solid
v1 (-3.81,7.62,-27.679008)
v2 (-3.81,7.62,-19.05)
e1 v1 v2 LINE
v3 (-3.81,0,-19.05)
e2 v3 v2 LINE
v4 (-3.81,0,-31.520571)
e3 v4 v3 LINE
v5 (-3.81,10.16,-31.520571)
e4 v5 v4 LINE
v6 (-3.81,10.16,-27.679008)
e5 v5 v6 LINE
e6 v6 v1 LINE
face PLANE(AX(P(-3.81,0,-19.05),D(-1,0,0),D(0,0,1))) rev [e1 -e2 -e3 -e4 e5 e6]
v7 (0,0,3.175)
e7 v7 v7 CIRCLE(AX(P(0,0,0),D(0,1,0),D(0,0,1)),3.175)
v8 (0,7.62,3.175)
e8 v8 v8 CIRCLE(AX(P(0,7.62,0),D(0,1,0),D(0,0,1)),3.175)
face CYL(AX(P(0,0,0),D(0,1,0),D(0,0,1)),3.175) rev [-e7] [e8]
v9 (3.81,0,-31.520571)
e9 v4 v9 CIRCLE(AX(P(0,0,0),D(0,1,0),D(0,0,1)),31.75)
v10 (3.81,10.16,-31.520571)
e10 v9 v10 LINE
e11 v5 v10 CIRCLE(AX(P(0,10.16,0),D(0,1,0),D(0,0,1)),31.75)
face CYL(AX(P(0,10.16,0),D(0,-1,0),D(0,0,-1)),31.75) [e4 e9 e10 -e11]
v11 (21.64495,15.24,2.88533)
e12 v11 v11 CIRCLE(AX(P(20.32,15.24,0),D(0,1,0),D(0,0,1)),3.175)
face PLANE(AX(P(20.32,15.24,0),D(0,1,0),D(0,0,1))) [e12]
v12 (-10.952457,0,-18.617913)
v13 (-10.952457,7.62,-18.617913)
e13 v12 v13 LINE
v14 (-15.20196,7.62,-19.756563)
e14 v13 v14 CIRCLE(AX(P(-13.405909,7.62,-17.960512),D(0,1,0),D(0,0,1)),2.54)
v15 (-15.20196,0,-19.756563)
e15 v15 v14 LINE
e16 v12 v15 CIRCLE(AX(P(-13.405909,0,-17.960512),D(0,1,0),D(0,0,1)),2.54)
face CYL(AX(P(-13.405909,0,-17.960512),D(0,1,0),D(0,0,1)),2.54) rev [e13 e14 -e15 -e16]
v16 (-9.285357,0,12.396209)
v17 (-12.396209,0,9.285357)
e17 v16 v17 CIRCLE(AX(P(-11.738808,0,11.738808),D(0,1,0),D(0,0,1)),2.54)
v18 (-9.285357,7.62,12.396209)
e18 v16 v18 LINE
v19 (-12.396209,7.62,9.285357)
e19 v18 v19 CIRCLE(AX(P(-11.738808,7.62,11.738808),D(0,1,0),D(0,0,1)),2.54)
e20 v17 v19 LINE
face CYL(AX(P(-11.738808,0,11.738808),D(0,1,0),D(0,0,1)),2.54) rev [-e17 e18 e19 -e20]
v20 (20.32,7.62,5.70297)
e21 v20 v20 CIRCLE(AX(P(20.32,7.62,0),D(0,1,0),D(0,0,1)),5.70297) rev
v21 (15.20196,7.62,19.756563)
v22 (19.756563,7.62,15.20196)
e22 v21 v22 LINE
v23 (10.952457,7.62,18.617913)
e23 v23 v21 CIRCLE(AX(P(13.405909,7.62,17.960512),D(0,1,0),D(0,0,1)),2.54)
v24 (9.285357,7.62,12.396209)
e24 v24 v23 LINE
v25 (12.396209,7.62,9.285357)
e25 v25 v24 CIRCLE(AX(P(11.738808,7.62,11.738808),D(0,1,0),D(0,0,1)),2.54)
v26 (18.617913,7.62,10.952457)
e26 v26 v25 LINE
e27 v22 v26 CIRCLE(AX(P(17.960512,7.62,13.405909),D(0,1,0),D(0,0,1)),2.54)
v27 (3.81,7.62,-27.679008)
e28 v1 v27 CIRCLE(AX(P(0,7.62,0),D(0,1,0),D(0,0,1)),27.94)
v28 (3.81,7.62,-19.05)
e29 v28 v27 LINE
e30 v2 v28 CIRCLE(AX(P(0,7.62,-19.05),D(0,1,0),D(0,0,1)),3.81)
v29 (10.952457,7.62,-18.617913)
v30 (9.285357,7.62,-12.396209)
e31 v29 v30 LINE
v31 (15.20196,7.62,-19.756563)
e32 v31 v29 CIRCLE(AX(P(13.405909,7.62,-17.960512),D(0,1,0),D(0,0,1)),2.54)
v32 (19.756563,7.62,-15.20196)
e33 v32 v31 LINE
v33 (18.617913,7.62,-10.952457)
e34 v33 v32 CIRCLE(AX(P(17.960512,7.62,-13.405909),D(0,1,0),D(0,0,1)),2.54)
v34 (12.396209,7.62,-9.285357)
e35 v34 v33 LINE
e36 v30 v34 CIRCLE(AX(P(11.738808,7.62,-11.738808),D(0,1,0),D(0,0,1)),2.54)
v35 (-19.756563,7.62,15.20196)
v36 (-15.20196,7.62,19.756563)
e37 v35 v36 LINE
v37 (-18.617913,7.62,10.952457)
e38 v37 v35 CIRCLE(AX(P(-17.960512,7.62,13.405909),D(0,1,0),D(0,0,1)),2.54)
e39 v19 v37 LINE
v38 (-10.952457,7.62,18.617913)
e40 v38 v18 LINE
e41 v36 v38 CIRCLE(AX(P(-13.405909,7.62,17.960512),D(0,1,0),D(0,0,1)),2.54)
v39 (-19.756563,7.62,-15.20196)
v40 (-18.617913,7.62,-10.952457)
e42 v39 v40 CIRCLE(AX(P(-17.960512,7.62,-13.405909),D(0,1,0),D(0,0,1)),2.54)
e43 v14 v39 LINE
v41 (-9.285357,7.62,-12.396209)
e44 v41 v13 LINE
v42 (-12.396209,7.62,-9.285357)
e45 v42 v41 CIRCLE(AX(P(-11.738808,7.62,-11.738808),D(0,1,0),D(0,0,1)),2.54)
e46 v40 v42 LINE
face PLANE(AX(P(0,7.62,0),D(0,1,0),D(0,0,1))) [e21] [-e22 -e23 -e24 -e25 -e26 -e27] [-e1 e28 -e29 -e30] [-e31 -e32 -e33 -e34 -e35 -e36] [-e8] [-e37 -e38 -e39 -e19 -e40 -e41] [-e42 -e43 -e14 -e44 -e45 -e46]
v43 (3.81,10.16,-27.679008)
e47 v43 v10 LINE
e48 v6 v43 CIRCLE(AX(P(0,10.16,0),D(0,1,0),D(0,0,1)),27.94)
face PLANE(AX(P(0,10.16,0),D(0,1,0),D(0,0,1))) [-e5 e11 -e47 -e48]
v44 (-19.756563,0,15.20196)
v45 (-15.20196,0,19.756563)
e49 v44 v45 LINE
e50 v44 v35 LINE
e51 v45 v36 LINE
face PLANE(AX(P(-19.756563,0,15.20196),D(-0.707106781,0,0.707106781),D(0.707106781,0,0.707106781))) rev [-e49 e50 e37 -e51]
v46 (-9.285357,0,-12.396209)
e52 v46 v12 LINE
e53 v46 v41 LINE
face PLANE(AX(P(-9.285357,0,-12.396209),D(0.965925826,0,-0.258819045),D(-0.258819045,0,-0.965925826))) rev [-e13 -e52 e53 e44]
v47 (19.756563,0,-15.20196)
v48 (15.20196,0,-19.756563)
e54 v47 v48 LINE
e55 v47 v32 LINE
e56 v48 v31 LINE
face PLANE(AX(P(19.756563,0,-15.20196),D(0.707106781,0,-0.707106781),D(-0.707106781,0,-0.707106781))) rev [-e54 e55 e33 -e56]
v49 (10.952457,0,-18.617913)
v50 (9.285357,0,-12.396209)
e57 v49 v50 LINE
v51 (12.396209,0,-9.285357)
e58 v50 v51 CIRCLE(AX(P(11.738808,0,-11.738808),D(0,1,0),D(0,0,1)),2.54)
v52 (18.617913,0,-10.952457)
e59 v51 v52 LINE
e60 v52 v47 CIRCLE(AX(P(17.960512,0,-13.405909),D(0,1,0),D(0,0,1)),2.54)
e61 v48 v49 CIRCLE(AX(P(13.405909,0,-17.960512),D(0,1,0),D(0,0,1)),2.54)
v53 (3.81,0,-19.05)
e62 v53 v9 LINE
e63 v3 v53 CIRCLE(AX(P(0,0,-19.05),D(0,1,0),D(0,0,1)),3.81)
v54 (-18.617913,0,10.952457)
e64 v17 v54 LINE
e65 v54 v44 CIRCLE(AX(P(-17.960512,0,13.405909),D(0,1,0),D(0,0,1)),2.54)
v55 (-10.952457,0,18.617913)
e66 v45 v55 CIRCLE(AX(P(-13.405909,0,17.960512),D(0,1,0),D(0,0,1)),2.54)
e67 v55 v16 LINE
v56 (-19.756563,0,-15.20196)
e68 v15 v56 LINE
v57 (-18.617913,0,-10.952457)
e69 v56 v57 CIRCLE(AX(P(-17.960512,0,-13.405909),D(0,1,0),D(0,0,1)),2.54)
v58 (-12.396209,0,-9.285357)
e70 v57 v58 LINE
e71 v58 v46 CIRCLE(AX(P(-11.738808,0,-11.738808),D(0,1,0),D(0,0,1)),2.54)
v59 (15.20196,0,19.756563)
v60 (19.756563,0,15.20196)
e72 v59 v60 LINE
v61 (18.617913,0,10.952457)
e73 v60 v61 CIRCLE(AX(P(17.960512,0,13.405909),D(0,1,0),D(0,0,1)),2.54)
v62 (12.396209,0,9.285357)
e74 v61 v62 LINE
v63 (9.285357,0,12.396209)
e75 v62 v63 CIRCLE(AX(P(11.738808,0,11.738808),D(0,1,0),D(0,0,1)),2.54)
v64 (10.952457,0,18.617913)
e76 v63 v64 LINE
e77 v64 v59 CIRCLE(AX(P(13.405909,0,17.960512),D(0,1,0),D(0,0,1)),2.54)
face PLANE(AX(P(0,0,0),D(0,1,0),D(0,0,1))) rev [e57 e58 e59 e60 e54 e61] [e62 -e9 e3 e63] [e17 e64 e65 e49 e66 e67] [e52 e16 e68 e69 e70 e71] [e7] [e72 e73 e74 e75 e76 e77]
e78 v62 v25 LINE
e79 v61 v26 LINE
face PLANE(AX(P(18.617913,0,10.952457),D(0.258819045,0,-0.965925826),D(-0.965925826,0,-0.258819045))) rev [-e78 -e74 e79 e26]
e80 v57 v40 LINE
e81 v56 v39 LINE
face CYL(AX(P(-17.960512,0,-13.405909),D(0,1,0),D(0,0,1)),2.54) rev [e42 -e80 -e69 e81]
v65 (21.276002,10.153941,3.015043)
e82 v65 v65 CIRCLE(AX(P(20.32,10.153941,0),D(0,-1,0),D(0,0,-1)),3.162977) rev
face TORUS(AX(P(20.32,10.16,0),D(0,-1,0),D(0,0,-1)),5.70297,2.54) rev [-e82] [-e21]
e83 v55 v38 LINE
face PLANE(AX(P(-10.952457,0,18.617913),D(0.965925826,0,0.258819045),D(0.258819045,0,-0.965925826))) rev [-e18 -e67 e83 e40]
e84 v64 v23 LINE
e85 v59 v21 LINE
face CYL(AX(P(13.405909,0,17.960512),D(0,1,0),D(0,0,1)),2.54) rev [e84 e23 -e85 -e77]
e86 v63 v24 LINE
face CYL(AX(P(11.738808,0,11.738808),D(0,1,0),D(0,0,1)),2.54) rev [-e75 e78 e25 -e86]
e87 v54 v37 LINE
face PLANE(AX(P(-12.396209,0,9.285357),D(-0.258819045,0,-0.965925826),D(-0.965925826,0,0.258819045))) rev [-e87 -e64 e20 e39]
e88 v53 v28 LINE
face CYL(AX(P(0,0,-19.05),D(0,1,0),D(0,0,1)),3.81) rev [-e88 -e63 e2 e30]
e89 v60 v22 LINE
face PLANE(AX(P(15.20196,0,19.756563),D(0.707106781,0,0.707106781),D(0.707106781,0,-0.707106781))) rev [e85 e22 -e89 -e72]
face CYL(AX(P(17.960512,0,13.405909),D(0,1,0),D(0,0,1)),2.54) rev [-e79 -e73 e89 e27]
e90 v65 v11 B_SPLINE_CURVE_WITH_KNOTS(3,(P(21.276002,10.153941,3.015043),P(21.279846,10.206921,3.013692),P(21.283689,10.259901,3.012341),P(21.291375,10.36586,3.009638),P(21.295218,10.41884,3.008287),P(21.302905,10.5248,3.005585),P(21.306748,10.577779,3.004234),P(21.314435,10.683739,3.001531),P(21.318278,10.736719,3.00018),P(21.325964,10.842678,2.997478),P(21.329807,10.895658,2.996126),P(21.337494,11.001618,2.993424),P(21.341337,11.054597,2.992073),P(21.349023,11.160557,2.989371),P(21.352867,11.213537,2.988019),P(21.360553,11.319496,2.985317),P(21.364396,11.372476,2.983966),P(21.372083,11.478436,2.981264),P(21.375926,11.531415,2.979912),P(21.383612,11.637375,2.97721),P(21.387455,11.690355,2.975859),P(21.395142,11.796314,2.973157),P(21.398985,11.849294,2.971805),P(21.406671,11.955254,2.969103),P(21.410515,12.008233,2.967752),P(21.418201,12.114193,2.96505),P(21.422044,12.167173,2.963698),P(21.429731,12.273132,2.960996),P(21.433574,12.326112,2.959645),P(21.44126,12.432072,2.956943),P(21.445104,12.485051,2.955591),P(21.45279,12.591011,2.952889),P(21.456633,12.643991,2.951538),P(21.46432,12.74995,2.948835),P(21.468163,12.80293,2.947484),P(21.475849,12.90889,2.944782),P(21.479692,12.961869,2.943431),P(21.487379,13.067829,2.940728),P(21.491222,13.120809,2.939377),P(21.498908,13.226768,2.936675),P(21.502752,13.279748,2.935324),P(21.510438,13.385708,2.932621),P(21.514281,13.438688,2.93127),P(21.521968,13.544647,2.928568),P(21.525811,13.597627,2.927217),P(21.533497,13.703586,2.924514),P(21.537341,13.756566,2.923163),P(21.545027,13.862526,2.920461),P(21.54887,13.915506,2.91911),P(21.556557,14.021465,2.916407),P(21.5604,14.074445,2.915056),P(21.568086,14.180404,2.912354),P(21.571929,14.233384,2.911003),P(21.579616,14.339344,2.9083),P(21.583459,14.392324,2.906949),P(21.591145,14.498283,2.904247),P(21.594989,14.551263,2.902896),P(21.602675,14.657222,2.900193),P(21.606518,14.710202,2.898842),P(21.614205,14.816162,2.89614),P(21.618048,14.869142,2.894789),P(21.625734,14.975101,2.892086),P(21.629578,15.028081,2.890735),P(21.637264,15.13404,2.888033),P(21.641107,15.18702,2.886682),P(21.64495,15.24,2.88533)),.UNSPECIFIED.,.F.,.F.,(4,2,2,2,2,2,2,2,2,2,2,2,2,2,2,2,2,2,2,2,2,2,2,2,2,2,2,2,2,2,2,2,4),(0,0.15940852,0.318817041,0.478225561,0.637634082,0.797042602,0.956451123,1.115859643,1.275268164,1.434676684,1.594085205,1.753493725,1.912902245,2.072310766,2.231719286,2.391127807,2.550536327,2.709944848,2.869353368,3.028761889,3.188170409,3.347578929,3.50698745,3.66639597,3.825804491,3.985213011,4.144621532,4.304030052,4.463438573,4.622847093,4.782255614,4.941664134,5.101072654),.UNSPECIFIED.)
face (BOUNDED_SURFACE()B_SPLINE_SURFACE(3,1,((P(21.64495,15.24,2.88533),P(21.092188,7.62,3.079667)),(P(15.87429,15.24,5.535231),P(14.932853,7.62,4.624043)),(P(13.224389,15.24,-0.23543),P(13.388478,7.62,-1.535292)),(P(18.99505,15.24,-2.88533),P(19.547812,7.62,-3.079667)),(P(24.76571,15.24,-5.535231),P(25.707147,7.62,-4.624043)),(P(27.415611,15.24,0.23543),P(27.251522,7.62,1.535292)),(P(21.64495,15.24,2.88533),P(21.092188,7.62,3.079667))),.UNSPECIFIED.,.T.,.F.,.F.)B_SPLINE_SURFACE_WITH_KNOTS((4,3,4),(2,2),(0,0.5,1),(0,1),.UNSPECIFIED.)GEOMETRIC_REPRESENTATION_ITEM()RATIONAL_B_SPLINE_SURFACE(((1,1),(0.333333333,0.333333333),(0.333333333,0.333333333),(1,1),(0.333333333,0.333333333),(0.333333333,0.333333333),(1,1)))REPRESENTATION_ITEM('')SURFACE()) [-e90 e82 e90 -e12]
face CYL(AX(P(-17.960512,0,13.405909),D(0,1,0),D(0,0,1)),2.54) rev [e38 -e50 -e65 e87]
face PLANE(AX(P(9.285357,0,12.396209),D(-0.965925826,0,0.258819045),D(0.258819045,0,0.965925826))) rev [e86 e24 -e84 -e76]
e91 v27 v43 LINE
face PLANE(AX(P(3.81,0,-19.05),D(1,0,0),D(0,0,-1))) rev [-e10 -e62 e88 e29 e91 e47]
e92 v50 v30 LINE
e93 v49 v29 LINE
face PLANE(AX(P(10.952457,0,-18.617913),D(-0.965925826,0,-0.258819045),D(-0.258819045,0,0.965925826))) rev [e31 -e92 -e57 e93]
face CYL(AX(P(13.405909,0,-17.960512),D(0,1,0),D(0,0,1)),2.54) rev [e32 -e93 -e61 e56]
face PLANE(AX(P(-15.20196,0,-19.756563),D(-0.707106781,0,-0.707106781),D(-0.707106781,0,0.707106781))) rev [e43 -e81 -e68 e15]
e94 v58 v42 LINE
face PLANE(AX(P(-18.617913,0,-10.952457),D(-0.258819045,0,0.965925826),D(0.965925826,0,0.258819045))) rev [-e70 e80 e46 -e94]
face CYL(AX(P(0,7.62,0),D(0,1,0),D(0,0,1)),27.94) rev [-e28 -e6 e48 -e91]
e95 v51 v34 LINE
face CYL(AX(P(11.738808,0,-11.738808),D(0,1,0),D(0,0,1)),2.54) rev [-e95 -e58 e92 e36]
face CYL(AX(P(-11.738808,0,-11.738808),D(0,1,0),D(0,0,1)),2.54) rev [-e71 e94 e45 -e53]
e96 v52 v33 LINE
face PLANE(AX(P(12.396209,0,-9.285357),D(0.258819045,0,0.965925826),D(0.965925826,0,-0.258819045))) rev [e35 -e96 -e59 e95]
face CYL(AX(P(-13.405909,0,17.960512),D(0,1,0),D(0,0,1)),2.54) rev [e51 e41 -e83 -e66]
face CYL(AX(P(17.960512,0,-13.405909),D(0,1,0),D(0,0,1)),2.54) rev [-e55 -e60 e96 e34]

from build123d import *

# Parameters (mm, degrees)
SKETCH1_R           = 31.75
BOSS_EXTRUDE3_DEPTH = 10.16
SKETCH3_R           = 27.94
CUT_EXTRUDE1_DEPTH  = 2.54
SKETCH4_R           = 3.175
CUT_EXTRUDE2_DEPTH  = 46.543269536
CUT_EXTRUDE3_DEPTH  = 46.543269536
CUT_EXTRUDE4_DEPTH  = 46.543269536
FILLET1_R           = 2.54


with BuildPart() as part:
    # Sketch1 → Boss-Extrude3 (new body)
    with BuildSketch(Plane(origin=(0, 0, 0), x_dir=(1, 0, 0), z_dir=(0, 1, 0))):
        with Locations(Location((0, 0, 0), (0, 0, 270))):
            Circle(SKETCH1_R)
    extrude(amount=BOSS_EXTRUDE3_DEPTH)

    # Sketch3 → Cut-Extrude1 (cut)
    with BuildSketch(Plane(origin=(0, 10.16, 0), x_dir=(1, 0, 0), z_dir=(0, 1, 0))):
        with Locations(Location((0, 0, 0), (0, 0, 270))):
            Circle(SKETCH3_R)
    extrude(amount=-CUT_EXTRUDE1_DEPTH, mode=Mode.SUBTRACT)

    # Sketch4 → Cut-Extrude2 (cut, through all)
    with BuildSketch(Plane(origin=(0, 7.62, 0), x_dir=(1, 0, 0), z_dir=(0, 1, 0))):
        with Locations(Location((0, 0, 0), (0, 0, 270))):
            Circle(SKETCH4_R)
    extrude(amount=-CUT_EXTRUDE2_DEPTH, mode=Mode.SUBTRACT)

    # Sketch5 → Cut-Extrude3 (cut, through all)
    with BuildSketch(Plane(origin=(0, 7.62, 0), x_dir=(1, 0, 0), z_dir=(0, 1, 0))):
        with BuildLine():
            Line((12.39620867, 9.285356697), (18.617912617, 10.952457245))
            ThreePointArc((18.617912617, 10.952457245), (20.413963841, 12.748508469), (19.756563466, 15.201960068))
            Line((19.756563466, 15.201960068), (15.201960068, 19.756563466))
            ThreePointArc((15.201960068, 19.756563466), (12.748508469, 20.413963841), (10.952457245, 18.617912617))
            Line((10.952457245, 18.617912617), (9.285356697, 12.39620867))
            ThreePointArc((9.285356697, 12.39620867), (9.942757071, 9.942757071), (12.39620867, 9.285356697))
        make_face()
        with BuildLine():
            Line((9.285356697, -12.39620867), (10.952457245, -18.617912617))
            ThreePointArc((10.952457245, -18.617912617), (12.748508469, -20.413963841), (15.201960068, -19.756563466))
            Line((15.201960068, -19.756563466), (19.756563466, -15.201960068))
            ThreePointArc((19.756563466, -15.201960068), (20.413963841, -12.748508469), (18.617912617, -10.952457245))
            Line((18.617912617, -10.952457245), (12.39620867, -9.285356697))
            ThreePointArc((12.39620867, -9.285356697), (9.942757071, -9.942757071), (9.285356697, -12.39620867))
        make_face()
        with BuildLine():
            Line((-12.39620867, -9.285356697), (-18.617912617, -10.952457245))
            ThreePointArc((-18.617912617, -10.952457245), (-20.413963841, -12.748508469), (-19.756563466, -15.201960068))
            Line((-19.756563466, -15.201960068), (-15.201960068, -19.756563466))
            ThreePointArc((-15.201960068, -19.756563466), (-12.748508469, -20.413963841), (-10.952457245, -18.617912617))
            Line((-10.952457245, -18.617912617), (-9.285356697, -12.39620867))
            ThreePointArc((-9.285356697, -12.39620867), (-9.942757071, -9.942757071), (-12.39620867, -9.285356697))
        make_face()
        with BuildLine():
            Line((-9.285356697, 12.39620867), (-10.952457245, 18.617912617))
            ThreePointArc((-10.952457245, 18.617912617), (-12.748508469, 20.413963841), (-15.201960068, 19.756563466))
            Line((-15.201960068, 19.756563466), (-19.756563466, 15.201960068))
            ThreePointArc((-19.756563466, 15.201960068), (-20.413963841, 12.748508469), (-18.617912617, 10.952457245))
            Line((-18.617912617, 10.952457245), (-12.39620867, 9.285356697))
            ThreePointArc((-12.39620867, 9.285356697), (-9.942757071, 9.942757071), (-9.285356697, 12.39620867))
        make_face()
        with BuildLine():
            Line((-3.81, 19.05), (-3.81, 34.374285303))
            Line((-3.81, 34.374285303), (3.81, 34.374285303))
            Line((3.81, 34.374285303), (3.81, 19.05))
            ThreePointArc((3.81, 19.05), (0, 15.24), (-3.81, 19.05))
        make_face()
    extrude(amount=-CUT_EXTRUDE3_DEPTH, mode=Mode.SUBTRACT)

    # Sketch5<2> → Cut-Extrude4 (cut, through all)
    with BuildSketch(Plane(origin=(0, 7.62, 0), x_dir=(1, 0, 0), z_dir=(0, 1, 0))):
        with BuildLine():
            Line((12.39620867, 9.285356697), (18.617912617, 10.952457245))
            ThreePointArc((18.617912617, 10.952457245), (20.413963841, 12.748508469), (19.756563466, 15.201960068))
            Line((19.756563466, 15.201960068), (15.201960068, 19.756563466))
            ThreePointArc((15.201960068, 19.756563466), (12.748508469, 20.413963841), (10.952457245, 18.617912617))
            Line((10.952457245, 18.617912617), (9.285356697, 12.39620867))
            ThreePointArc((9.285356697, 12.39620867), (9.942757071, 9.942757071), (12.39620867, 9.285356697))
        make_face()
        with BuildLine():
            Line((9.285356697, -12.39620867), (10.952457245, -18.617912617))
            ThreePointArc((10.952457245, -18.617912617), (12.748508469, -20.413963841), (15.201960068, -19.756563466))
            Line((15.201960068, -19.756563466), (19.756563466, -15.201960068))
            ThreePointArc((19.756563466, -15.201960068), (20.413963841, -12.748508469), (18.617912617, -10.952457245))
            Line((18.617912617, -10.952457245), (12.39620867, -9.285356697))
            ThreePointArc((12.39620867, -9.285356697), (9.942757071, -9.942757071), (9.285356697, -12.39620867))
        make_face()
        with BuildLine():
            Line((-12.39620867, -9.285356697), (-18.617912617, -10.952457245))
            ThreePointArc((-18.617912617, -10.952457245), (-20.413963841, -12.748508469), (-19.756563466, -15.201960068))
            Line((-19.756563466, -15.201960068), (-15.201960068, -19.756563466))
            ThreePointArc((-15.201960068, -19.756563466), (-12.748508469, -20.413963841), (-10.952457245, -18.617912617))
            Line((-10.952457245, -18.617912617), (-9.285356697, -12.39620867))
            ThreePointArc((-9.285356697, -12.39620867), (-9.942757071, -9.942757071), (-12.39620867, -9.285356697))
        make_face()
        with BuildLine():
            Line((-9.285356697, 12.39620867), (-10.952457245, 18.617912617))
            ThreePointArc((-10.952457245, 18.617912617), (-12.748508469, 20.413963841), (-15.201960068, 19.756563466))
            Line((-15.201960068, 19.756563466), (-19.756563466, 15.201960068))
            ThreePointArc((-19.756563466, 15.201960068), (-20.413963841, 12.748508469), (-18.617912617, 10.952457245))
            Line((-18.617912617, 10.952457245), (-12.39620867, 9.285356697))
            ThreePointArc((-12.39620867, 9.285356697), (-9.942757071, 9.942757071), (-9.285356697, 12.39620867))
        make_face()
        with BuildLine():
            Line((-3.81, 19.05), (-3.81, 34.374285303))
            Line((-3.81, 34.374285303), (3.81, 34.374285303))
            Line((3.81, 34.374285303), (3.81, 19.05))
            ThreePointArc((3.81, 19.05), (0, 15.24), (-3.81, 19.05))
        make_face()
    extrude(amount=CUT_EXTRUDE4_DEPTH, mode=Mode.SUBTRACT)

    # Loft4: read off the stored shape, not the designer's step
    # Loft4: loft between two sections, ruled curve by curve
    loft4_from = [
        Edge.make_bspline([(21.644950372, 15.24, 2.885330399), (15.874289575, 15.24, 5.535231144), (13.22438883, 15.24, -0.235429654), (18.995049628, 15.24, -2.885330399), (24.765710425, 15.24, -5.535231144), (27.41561117, 15.24, 0.235429654), (21.644950372, 15.24, 2.885330399)], [0, 0, 0, 0, 0.5, 0.5, 0.5, 1, 1, 1, 1], 3, [1, 0.333333333, 0.333333333, 1, 0.333333333, 0.333333333, 1]),
    ]
    loft4_to = [
        Edge.make_bspline([(21.092187722, 7.62, 3.079667372), (14.932852978, 7.62, 4.624042816), (13.388477534, 7.62, -1.535291928), (19.547812278, 7.62, -3.079667372), (25.707147022, 7.62, -4.624042816), (27.251522466, 7.62, 1.535291928), (21.092187722, 7.62, 3.079667372)], [0, 0, 0, 0, 0.5, 0.5, 0.5, 1, 1, 1, 1], 3, [1, 0.333333333, 0.333333333, 1, 0.333333333, 0.333333333, 1]),
    ]
    loft4 = Solid(Shell([*[Face.make_surface_from_curves(loft4_from[k], loft4_to[k]) for k in range(1)], Face(Wire(loft4_from)), Face(Wire(loft4_to))]))
    add(loft4)

    # Fillet1
    fillet1_edges = [part.edges().sort_by_distance(p)[0] for p in [
        (19.547812278, 7.62, -3.079667372),
    ]]
    fillet(fillet1_edges, radius=FILLET1_R)


solid = part.part
